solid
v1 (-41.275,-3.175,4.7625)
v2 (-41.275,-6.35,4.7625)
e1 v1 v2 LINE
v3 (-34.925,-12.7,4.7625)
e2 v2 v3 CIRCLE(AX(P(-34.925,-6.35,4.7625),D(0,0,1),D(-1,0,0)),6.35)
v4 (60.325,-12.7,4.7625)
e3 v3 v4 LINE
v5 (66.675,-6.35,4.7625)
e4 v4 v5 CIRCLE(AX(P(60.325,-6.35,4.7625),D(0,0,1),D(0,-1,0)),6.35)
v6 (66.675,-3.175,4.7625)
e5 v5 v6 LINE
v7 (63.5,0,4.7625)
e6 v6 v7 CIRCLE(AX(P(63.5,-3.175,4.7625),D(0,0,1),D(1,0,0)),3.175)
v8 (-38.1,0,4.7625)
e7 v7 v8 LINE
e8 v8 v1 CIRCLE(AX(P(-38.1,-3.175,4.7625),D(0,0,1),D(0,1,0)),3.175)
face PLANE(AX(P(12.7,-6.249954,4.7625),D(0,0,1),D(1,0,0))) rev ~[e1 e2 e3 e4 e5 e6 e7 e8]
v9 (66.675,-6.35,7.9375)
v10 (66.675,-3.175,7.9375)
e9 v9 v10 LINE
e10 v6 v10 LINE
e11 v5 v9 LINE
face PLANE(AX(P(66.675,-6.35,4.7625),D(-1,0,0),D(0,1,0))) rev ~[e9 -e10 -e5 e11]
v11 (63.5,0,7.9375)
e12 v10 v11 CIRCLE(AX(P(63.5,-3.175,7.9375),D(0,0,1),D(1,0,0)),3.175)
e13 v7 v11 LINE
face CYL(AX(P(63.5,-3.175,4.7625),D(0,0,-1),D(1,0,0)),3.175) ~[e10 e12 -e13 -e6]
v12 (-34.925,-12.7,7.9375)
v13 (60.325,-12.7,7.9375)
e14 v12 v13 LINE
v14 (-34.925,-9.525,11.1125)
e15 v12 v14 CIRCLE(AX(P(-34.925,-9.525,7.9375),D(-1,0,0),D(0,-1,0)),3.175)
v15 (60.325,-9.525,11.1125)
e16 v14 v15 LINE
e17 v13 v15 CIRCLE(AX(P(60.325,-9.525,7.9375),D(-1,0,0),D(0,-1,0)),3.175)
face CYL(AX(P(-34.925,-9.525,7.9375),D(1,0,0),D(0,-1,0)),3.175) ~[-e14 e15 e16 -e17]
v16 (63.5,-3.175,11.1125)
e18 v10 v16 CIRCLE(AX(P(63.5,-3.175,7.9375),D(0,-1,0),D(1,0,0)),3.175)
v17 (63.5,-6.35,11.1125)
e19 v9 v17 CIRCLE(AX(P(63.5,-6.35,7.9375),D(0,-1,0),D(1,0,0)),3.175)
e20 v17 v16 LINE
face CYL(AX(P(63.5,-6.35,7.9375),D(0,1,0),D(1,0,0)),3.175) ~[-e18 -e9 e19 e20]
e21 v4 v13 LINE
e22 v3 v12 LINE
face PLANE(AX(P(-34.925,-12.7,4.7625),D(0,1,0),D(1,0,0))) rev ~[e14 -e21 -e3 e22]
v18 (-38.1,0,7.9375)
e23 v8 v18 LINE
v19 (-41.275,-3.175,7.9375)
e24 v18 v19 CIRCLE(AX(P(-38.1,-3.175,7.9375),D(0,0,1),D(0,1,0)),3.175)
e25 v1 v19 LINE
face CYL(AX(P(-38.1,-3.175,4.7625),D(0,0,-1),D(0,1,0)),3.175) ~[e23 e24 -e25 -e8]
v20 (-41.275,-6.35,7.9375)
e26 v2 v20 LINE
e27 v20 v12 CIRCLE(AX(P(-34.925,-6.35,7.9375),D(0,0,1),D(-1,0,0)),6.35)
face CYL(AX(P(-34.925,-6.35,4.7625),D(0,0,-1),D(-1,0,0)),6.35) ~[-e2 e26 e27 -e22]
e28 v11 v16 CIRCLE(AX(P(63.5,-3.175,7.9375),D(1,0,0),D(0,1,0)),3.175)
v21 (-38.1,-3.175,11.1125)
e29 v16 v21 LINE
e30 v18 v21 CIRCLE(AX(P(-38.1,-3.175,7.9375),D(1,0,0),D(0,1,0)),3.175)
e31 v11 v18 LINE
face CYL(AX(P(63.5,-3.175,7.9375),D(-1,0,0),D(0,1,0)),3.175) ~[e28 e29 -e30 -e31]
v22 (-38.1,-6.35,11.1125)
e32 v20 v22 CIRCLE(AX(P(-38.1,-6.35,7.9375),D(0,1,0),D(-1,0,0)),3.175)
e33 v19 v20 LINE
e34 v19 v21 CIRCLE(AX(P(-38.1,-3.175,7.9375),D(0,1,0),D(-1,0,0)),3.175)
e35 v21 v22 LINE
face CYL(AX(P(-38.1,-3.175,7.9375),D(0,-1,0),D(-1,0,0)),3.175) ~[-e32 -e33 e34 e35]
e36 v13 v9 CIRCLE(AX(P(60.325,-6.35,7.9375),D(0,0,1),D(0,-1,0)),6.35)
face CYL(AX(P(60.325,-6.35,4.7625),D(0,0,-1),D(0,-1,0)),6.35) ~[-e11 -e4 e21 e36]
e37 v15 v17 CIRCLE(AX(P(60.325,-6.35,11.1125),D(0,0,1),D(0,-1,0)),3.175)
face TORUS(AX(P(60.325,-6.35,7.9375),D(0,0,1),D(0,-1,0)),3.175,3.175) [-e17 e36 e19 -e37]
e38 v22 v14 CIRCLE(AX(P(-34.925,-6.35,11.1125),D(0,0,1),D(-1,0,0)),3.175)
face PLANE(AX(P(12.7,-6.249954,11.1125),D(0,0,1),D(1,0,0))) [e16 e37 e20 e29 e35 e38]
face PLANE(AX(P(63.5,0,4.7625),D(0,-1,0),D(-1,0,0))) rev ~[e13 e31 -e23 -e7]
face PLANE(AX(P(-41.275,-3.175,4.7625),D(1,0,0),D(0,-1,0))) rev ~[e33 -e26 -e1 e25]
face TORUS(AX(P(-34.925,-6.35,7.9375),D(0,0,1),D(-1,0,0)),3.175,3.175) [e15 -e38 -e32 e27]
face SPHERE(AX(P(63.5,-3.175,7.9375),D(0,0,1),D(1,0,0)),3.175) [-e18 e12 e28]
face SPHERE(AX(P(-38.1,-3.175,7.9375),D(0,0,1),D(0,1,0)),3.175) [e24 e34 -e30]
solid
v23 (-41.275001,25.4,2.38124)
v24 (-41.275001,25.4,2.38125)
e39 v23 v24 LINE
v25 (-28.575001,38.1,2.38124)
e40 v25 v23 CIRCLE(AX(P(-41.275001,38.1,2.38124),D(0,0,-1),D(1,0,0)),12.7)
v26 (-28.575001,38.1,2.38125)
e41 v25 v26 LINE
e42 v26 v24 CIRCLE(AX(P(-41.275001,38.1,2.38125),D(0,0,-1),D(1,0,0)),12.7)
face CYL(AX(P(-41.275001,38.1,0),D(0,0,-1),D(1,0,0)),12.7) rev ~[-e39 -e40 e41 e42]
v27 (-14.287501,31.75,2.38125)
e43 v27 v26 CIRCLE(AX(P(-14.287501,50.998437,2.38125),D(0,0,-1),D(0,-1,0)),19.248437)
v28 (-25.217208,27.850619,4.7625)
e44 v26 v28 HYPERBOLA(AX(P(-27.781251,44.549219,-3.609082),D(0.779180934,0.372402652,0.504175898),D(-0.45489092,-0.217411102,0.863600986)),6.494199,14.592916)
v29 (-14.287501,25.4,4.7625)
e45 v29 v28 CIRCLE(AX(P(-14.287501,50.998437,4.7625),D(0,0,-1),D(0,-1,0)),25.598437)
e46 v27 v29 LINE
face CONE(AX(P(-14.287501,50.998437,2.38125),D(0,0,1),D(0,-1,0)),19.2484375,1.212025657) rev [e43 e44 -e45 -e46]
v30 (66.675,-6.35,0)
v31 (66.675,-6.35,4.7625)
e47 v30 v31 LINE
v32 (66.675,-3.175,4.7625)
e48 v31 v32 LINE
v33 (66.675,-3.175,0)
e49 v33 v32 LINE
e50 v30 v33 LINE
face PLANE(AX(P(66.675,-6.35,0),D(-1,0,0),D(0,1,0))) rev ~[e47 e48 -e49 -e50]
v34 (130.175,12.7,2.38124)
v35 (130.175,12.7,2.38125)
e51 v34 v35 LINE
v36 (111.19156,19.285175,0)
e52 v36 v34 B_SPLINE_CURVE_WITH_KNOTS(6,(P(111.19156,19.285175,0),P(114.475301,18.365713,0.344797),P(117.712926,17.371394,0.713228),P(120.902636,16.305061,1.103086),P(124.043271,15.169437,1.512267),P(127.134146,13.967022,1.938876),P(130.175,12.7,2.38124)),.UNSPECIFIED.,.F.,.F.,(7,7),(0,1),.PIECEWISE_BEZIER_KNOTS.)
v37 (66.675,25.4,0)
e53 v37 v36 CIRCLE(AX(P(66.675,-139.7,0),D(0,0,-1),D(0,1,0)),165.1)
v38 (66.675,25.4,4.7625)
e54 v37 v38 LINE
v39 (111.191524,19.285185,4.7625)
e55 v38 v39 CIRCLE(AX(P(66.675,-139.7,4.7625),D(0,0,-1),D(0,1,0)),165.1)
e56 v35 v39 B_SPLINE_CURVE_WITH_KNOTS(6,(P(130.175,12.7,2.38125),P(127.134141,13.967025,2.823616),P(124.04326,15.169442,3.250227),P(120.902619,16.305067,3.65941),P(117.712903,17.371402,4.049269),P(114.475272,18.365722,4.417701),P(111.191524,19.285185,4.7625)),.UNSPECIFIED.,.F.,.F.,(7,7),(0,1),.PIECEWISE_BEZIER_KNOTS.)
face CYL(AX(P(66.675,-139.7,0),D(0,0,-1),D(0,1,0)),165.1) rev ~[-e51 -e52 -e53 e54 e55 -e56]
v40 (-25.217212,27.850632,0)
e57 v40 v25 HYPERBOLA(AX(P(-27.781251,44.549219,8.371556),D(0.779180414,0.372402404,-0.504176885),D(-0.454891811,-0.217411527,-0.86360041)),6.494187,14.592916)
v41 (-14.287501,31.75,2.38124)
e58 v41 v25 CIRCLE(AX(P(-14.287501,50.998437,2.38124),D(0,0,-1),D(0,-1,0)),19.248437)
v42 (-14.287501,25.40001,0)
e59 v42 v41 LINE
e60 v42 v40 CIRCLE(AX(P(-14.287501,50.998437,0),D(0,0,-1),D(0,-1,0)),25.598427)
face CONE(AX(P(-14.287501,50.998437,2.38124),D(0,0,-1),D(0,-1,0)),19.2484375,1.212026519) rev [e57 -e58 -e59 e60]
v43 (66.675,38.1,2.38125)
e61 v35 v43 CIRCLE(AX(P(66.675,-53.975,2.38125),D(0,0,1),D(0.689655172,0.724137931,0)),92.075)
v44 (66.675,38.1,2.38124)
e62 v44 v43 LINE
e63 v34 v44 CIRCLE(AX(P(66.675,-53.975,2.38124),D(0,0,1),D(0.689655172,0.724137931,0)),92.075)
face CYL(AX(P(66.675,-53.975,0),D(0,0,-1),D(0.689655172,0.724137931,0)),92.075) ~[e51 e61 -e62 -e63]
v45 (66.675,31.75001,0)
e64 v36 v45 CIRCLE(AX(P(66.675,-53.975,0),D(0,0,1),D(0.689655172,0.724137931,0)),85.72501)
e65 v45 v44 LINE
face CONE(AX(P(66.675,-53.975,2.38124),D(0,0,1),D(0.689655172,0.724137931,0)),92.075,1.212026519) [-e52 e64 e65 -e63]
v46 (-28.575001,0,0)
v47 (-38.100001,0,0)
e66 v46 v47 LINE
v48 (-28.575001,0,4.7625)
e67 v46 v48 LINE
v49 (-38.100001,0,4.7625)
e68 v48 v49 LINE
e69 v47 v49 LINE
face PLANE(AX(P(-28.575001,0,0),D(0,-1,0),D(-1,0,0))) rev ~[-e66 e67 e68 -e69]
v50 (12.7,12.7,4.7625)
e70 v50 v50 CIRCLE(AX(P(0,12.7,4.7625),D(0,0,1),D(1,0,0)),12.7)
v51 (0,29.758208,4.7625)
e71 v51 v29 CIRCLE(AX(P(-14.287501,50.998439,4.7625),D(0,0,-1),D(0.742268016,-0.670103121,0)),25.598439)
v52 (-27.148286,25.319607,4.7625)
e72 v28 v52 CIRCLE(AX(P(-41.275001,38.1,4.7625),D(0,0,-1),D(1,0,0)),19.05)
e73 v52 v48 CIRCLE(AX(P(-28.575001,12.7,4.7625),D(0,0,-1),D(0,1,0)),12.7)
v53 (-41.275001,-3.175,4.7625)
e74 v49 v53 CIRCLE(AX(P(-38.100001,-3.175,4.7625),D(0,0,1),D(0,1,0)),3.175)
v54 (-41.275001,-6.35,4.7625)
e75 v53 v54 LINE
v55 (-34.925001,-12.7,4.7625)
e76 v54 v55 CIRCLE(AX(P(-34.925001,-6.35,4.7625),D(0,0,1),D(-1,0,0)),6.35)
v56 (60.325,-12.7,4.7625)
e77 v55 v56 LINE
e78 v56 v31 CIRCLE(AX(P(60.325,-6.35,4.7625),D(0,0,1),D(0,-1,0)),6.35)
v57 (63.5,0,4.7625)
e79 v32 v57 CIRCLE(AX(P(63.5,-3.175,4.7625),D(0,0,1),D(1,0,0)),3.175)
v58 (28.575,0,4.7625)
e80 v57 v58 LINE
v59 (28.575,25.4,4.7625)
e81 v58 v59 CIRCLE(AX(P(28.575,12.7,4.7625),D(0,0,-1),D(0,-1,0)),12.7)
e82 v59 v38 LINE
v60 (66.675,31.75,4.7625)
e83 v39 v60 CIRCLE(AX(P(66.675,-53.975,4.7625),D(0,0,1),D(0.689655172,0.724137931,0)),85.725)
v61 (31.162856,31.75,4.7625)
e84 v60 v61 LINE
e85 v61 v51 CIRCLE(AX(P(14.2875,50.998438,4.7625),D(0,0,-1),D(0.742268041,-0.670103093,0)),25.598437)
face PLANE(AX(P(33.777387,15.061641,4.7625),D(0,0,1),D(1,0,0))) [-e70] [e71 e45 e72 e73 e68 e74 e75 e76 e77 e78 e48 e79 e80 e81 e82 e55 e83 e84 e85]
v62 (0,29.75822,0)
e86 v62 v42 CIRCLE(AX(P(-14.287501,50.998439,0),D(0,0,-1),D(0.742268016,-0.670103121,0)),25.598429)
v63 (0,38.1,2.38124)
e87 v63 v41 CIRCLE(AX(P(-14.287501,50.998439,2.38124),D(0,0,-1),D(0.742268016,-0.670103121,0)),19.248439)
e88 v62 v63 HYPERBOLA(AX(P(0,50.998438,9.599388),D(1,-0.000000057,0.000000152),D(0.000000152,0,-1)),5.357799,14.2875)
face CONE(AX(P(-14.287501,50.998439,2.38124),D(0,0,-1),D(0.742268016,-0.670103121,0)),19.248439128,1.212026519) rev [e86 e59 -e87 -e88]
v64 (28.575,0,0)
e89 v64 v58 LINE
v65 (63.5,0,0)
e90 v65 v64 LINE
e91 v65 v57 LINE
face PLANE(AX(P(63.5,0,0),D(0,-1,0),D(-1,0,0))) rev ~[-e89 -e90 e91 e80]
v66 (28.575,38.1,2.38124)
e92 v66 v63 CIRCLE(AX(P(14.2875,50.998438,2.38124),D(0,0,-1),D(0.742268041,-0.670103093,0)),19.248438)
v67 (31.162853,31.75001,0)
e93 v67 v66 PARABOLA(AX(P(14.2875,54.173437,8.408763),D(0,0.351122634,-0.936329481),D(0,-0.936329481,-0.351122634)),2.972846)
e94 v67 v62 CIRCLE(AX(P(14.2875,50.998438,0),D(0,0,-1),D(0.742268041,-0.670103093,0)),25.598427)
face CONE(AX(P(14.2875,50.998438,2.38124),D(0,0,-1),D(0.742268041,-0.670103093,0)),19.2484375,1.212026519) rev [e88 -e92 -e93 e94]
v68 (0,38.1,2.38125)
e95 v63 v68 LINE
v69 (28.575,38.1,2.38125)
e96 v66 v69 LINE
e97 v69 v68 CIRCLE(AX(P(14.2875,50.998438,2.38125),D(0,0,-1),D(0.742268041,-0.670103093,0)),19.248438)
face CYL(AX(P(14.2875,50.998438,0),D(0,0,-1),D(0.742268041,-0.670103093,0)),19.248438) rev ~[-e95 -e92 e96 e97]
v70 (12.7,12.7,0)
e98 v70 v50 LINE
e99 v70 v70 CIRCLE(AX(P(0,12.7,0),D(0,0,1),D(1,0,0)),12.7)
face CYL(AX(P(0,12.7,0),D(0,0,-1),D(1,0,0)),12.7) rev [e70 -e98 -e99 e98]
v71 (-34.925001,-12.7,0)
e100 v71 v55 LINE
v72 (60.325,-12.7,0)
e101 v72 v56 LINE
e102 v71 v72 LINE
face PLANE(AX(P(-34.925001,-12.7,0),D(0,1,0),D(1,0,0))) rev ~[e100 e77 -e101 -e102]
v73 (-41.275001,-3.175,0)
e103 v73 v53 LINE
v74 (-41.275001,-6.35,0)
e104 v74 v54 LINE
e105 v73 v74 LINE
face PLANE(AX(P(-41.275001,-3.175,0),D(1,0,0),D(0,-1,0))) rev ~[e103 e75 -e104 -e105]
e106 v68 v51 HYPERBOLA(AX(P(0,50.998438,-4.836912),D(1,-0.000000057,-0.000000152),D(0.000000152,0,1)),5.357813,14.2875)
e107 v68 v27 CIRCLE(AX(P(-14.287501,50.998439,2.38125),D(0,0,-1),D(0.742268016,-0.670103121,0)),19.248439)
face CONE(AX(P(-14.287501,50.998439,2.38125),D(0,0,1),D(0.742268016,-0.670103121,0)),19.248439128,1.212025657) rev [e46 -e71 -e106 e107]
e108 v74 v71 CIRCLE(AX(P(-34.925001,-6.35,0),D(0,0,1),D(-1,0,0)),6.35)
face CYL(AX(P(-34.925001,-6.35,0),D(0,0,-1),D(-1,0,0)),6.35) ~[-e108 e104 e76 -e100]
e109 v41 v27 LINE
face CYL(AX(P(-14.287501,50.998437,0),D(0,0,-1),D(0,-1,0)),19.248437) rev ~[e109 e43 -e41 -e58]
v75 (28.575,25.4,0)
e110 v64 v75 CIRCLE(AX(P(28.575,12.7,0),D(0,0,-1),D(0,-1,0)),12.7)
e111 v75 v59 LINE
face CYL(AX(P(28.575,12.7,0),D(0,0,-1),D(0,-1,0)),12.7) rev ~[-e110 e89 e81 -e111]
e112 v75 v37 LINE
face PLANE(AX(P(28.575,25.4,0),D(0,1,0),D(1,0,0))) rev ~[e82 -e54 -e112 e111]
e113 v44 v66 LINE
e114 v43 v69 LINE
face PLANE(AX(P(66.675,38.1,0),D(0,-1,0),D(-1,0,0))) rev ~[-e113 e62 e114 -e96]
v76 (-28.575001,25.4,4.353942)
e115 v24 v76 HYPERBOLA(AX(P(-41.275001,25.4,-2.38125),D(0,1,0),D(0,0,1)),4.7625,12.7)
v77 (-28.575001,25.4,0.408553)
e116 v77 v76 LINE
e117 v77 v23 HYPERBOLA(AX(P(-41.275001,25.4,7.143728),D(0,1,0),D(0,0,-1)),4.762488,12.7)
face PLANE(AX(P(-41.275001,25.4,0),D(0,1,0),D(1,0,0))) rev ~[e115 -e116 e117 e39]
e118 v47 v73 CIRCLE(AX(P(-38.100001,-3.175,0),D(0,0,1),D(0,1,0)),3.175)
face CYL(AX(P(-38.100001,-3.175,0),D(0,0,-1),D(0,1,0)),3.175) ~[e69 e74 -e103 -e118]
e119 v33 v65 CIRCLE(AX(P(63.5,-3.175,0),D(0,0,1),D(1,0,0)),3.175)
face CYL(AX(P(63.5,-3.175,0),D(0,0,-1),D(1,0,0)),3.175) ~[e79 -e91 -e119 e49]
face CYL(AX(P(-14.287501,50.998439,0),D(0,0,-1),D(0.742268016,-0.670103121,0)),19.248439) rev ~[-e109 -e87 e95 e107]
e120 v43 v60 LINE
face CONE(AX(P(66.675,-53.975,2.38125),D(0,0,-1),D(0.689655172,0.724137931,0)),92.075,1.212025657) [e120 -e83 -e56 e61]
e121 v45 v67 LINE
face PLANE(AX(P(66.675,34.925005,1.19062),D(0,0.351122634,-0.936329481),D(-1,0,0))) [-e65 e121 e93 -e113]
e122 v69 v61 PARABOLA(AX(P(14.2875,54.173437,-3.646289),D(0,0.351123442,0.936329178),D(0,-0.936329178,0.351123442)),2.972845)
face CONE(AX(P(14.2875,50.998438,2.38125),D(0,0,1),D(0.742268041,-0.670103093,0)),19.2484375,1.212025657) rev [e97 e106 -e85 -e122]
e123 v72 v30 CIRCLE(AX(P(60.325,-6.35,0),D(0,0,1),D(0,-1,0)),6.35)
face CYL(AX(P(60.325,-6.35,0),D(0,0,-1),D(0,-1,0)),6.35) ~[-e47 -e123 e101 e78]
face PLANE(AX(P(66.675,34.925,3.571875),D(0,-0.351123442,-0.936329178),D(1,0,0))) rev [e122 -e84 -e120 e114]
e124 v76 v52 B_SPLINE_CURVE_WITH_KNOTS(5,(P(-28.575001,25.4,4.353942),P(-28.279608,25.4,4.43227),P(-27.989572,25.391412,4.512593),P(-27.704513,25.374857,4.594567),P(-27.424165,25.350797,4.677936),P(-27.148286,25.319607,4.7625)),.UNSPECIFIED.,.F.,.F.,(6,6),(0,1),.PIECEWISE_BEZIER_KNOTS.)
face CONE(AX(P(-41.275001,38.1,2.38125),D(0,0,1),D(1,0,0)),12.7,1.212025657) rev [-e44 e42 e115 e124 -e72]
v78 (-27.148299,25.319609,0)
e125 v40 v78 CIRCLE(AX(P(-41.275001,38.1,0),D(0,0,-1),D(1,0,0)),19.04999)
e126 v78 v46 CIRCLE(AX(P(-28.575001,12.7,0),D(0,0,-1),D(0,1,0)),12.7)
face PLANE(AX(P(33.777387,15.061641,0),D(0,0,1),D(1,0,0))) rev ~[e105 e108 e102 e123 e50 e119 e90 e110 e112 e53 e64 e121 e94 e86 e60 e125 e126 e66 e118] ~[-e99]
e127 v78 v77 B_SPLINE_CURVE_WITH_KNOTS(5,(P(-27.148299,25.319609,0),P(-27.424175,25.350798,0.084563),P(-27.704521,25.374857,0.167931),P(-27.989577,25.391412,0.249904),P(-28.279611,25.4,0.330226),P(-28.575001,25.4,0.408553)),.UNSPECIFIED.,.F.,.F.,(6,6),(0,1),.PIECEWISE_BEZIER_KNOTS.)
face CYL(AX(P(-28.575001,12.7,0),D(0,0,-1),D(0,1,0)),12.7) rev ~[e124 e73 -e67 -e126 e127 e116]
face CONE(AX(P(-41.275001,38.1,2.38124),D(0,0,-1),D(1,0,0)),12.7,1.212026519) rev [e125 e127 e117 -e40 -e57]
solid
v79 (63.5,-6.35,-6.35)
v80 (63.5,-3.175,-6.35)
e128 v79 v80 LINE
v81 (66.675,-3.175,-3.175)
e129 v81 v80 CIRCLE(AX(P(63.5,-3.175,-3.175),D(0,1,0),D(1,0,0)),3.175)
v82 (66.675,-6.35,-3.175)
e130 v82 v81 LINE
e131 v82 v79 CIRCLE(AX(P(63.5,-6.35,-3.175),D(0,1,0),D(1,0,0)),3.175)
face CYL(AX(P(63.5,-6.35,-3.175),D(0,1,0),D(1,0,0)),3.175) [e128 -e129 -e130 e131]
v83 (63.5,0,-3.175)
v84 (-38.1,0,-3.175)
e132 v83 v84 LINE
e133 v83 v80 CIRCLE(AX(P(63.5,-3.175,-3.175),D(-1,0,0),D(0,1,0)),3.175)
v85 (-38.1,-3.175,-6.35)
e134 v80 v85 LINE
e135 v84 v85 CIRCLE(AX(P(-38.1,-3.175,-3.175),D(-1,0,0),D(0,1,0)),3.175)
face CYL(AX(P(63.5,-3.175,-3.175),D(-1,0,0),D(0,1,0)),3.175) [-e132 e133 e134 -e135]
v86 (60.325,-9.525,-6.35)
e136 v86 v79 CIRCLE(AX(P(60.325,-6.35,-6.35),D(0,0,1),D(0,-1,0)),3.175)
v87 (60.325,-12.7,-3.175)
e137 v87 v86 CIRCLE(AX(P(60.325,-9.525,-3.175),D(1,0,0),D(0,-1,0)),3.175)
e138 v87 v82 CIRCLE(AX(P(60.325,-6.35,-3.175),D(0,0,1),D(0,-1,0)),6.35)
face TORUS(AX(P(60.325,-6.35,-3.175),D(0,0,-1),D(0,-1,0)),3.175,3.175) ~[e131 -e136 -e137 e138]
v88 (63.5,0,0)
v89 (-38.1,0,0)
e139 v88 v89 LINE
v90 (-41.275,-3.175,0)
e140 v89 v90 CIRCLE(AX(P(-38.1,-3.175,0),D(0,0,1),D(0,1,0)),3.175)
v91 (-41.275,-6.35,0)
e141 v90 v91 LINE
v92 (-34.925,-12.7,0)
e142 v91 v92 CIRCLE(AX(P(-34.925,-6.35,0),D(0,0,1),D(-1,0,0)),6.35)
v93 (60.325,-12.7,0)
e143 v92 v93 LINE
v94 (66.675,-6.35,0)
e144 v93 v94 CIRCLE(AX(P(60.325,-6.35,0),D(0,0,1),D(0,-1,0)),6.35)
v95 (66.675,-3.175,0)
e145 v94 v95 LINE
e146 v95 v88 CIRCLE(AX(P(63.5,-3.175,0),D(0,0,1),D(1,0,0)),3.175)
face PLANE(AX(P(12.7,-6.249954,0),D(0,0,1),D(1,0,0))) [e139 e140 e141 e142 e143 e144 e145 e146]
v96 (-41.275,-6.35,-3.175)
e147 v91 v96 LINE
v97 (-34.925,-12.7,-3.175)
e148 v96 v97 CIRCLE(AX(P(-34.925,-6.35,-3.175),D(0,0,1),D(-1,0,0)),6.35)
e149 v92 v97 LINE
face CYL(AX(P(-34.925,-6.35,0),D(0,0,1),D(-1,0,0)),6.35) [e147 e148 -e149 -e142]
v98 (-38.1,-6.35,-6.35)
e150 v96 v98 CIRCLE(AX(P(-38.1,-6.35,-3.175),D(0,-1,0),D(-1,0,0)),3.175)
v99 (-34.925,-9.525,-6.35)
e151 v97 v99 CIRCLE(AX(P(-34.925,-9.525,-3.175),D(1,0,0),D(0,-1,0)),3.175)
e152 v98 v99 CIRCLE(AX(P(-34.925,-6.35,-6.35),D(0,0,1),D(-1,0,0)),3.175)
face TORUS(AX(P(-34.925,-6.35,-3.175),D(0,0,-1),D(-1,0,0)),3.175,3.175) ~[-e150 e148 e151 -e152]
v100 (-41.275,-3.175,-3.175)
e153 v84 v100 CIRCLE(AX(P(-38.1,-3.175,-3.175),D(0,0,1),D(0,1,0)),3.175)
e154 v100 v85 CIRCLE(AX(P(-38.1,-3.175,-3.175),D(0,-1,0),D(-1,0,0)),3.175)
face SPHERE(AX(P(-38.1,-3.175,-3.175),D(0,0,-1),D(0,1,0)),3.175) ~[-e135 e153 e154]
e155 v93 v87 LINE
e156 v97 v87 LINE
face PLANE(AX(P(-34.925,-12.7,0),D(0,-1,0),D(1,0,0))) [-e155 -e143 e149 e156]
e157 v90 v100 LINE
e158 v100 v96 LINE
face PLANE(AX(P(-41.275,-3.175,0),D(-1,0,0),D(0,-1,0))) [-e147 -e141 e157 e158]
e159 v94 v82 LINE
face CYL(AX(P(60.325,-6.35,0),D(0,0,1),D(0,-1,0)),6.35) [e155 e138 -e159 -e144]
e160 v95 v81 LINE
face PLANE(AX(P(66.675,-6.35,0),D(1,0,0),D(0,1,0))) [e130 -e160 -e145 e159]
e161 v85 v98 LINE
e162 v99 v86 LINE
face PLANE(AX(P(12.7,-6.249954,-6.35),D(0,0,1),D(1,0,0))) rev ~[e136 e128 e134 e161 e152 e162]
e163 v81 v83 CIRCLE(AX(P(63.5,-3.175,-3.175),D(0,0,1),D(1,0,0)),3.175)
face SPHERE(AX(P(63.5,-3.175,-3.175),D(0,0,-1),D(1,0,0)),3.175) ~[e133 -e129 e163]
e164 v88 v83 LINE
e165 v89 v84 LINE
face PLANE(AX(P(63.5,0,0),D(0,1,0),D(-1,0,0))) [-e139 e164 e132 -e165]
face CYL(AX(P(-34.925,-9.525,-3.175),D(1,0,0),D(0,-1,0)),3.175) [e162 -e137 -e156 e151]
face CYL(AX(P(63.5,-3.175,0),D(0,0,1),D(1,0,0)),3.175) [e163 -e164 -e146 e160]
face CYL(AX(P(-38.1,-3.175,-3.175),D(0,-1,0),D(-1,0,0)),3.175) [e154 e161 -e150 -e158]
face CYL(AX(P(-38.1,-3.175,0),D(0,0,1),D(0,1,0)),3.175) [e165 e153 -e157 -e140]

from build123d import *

# Parameters (mm, degrees)
F0_R     = 12.7
F1_DEPTH = 4.7625
F3_START = 4.7625
F3_DEPTH = 6.35
F4_DEPTH = 6.35
F5_R     = 3.175
F5_2_R   = 3.175
F6_SIZE2 = 6.35
F6_SIZE  = 2.38125
F7_SIZE2 = 2.38124
F7_SIZE  = 6.34999


# Not quite as in the source:
# - a fillet or chamfer is up to 0.001 mm smaller than in the source, because OpenCascade refuses the exact size


with BuildPart() as f1:
    # F0 (on Top) → F1 (new body)
    with BuildSketch(Plane.XY):
        with BuildLine():
            Line((63.5, 0), (28.575, 0))
            ThreePointArc((28.575, 0), (15.875, 12.7), (28.575, 25.4))
            Line((28.575, 25.4), (66.675, 25.4))
            ThreePointArc((66.675, 25.4), (99.0537739113, 22.1938695566), (130.175, 12.7))
            ThreePointArc((130.175, 12.7), (100.8707965253, 31.5144913133), (66.675, 38.1))
            Line((66.675, 38.1), (28.575, 38.1))
            ThreePointArc((28.575, 38.1), (14.2875, 31.75), (0, 38.1))
            ThreePointArc((0, 38.1), (-6.4699695128, 33.408993013), (-14.2875007235, 31.75))
            ThreePointArc((-14.2875007235, 31.75), (-22.1050316037, 33.4089930196), (-28.5750007235, 38.1))
            ThreePointArc((-28.5750007235, 38.1), (-32.2947446025, 29.1197438789), (-41.2750007235, 25.4))
            Line((-41.2750007235, 25.4), (-28.5750007235, 25.4))
            ThreePointArc((-28.5750007235, 25.4), (-15.8750007235, 12.7), (-28.5750007235, 0))
            Line((-28.5750007235, 0), (-38.1000007235, 0))
            ThreePointArc((-38.1000007235, 0), (-40.3450647538, -0.9299359697), (-41.2750007235, -3.175))
            Line((-41.2750007235, -3.175), (-41.2750007235, -6.35))
            ThreePointArc((-41.2750007235, -6.35), (-39.4151287841, -10.8401280605), (-34.9250007235, -12.7))
            Line((-34.9250007235, -12.7), (60.325, -12.7))
            ThreePointArc((60.325, -12.7), (64.8151280605, -10.8401280605), (66.675, -6.35))
            Line((66.675, -6.35), (66.675, -3.175))
            ThreePointArc((66.675, -3.175), (65.7450640303, -0.9299359697), (63.5, 0))
        make_face()
        with Locations((0, 12.7)):
            Circle(F0_R, mode=Mode.SUBTRACT)
    extrude(amount=F1_DEPTH)

    # F6
    f6_edges = [f1.edges().sort_by_distance(p)[0] for p in [
        (47.625, 38.1, 4.7625),
        (14.2875, 31.75, 4.7625),
        (100.870797, 31.514491, 4.7625),
        (-22.105032, 33.408993, 4.7625),
        (-6.46997, 33.408993, 4.7625),
        (-32.294745, 29.119744, 4.7625),
    ]]
    chamfer(f6_edges, length=F6_SIZE, length2=F6_SIZE2)

    # F7 (size 6.35 and 2.38125 in the source; OpenCascade refuses exactly that, so slightly less here)
    f7_edges = [f1.edges().sort_by_distance(p)[0] for p in [
        (-32.294745, 29.119744, 0),
        (-22.105032, 33.408993, 0),
        (-6.46997, 33.408993, 0),
        (14.2875, 31.75, 0),
        (47.625, 38.1, 0),
        (100.870797, 31.514491, 0),
    ]]
    f7_side = f1.faces().sort_by_distance((-31.030313, 27.855312, 0))[0]
    chamfer(f7_edges, length=F7_SIZE, length2=F7_SIZE2, reference=f7_side)


with BuildPart() as f3:
    # F2 (on Top) → F3 (new body)
    with BuildSketch(Plane.XY.offset(F3_START)):
        with BuildLine():
            Line((63.5, 0), (-38.1, 0))
            ThreePointArc((-38.1, 0), (-40.3450640303, -0.9299359697), (-41.275, -3.175))
            Line((-41.275, -3.175), (-41.275, -6.35))
            ThreePointArc((-41.275, -6.35), (-39.4151280605, -10.8401280605), (-34.925, -12.7))
            Line((-34.925, -12.7), (60.325, -12.7))
            ThreePointArc((60.325, -12.7), (64.8151280605, -10.8401280605), (66.675, -6.35))
            Line((66.675, -6.35), (66.675, -3.175))
            ThreePointArc((66.675, -3.175), (65.7450640303, -0.9299359697), (63.5, 0))
        make_face()
    extrude(amount=F3_DEPTH)

    # F5
    f5_edges = [f3.edges().sort_by_distance(p)[0] for p in [
        (12.7, 0, 11.1125),
        (-40.345064, -0.929936, 11.1125),
        (-41.275, -4.7625, 11.1125),
        (-39.415128, -10.840128, 11.1125),
        (12.7, -12.7, 11.1125),
        (64.815128, -10.840128, 11.1125),
        (66.675, -4.7625, 11.1125),
        (65.745064, -0.929936, 11.1125),
    ]]
    fillet(f5_edges, radius=F5_R)


with BuildPart() as f4:
    # F2 (on Top) → F4 (new body)
    with BuildSketch(Plane.XY):
        with BuildLine():
            Line((63.5, 0), (-38.1, 0))
            ThreePointArc((-38.1, 0), (-40.3450640303, -0.9299359697), (-41.275, -3.175))
            Line((-41.275, -3.175), (-41.275, -6.35))
            ThreePointArc((-41.275, -6.35), (-39.4151280605, -10.8401280605), (-34.925, -12.7))
            Line((-34.925, -12.7), (60.325, -12.7))
            ThreePointArc((60.325, -12.7), (64.8151280605, -10.8401280605), (66.675, -6.35))
            Line((66.675, -6.35), (66.675, -3.175))
            ThreePointArc((66.675, -3.175), (65.7450640303, -0.9299359697), (63.5, 0))
        make_face()
    extrude(amount=-F4_DEPTH)

    # F5#2
    f5_2_edges = [f4.edges().sort_by_distance(p)[0] for p in [
        (12.7, 0, -6.35),
        (-40.345064, -0.929936, -6.35),
        (-41.275, -4.7625, -6.35),
        (-39.415128, -10.840128, -6.35),
        (12.7, -12.7, -6.35),
        (64.815128, -10.840128, -6.35),
        (66.675, -4.7625, -6.35),
        (65.745064, -0.929936, -6.35),
    ]]
    fillet(f5_2_edges, radius=F5_2_R)


solid = Compound([f1.part, f3.part, f4.part])
